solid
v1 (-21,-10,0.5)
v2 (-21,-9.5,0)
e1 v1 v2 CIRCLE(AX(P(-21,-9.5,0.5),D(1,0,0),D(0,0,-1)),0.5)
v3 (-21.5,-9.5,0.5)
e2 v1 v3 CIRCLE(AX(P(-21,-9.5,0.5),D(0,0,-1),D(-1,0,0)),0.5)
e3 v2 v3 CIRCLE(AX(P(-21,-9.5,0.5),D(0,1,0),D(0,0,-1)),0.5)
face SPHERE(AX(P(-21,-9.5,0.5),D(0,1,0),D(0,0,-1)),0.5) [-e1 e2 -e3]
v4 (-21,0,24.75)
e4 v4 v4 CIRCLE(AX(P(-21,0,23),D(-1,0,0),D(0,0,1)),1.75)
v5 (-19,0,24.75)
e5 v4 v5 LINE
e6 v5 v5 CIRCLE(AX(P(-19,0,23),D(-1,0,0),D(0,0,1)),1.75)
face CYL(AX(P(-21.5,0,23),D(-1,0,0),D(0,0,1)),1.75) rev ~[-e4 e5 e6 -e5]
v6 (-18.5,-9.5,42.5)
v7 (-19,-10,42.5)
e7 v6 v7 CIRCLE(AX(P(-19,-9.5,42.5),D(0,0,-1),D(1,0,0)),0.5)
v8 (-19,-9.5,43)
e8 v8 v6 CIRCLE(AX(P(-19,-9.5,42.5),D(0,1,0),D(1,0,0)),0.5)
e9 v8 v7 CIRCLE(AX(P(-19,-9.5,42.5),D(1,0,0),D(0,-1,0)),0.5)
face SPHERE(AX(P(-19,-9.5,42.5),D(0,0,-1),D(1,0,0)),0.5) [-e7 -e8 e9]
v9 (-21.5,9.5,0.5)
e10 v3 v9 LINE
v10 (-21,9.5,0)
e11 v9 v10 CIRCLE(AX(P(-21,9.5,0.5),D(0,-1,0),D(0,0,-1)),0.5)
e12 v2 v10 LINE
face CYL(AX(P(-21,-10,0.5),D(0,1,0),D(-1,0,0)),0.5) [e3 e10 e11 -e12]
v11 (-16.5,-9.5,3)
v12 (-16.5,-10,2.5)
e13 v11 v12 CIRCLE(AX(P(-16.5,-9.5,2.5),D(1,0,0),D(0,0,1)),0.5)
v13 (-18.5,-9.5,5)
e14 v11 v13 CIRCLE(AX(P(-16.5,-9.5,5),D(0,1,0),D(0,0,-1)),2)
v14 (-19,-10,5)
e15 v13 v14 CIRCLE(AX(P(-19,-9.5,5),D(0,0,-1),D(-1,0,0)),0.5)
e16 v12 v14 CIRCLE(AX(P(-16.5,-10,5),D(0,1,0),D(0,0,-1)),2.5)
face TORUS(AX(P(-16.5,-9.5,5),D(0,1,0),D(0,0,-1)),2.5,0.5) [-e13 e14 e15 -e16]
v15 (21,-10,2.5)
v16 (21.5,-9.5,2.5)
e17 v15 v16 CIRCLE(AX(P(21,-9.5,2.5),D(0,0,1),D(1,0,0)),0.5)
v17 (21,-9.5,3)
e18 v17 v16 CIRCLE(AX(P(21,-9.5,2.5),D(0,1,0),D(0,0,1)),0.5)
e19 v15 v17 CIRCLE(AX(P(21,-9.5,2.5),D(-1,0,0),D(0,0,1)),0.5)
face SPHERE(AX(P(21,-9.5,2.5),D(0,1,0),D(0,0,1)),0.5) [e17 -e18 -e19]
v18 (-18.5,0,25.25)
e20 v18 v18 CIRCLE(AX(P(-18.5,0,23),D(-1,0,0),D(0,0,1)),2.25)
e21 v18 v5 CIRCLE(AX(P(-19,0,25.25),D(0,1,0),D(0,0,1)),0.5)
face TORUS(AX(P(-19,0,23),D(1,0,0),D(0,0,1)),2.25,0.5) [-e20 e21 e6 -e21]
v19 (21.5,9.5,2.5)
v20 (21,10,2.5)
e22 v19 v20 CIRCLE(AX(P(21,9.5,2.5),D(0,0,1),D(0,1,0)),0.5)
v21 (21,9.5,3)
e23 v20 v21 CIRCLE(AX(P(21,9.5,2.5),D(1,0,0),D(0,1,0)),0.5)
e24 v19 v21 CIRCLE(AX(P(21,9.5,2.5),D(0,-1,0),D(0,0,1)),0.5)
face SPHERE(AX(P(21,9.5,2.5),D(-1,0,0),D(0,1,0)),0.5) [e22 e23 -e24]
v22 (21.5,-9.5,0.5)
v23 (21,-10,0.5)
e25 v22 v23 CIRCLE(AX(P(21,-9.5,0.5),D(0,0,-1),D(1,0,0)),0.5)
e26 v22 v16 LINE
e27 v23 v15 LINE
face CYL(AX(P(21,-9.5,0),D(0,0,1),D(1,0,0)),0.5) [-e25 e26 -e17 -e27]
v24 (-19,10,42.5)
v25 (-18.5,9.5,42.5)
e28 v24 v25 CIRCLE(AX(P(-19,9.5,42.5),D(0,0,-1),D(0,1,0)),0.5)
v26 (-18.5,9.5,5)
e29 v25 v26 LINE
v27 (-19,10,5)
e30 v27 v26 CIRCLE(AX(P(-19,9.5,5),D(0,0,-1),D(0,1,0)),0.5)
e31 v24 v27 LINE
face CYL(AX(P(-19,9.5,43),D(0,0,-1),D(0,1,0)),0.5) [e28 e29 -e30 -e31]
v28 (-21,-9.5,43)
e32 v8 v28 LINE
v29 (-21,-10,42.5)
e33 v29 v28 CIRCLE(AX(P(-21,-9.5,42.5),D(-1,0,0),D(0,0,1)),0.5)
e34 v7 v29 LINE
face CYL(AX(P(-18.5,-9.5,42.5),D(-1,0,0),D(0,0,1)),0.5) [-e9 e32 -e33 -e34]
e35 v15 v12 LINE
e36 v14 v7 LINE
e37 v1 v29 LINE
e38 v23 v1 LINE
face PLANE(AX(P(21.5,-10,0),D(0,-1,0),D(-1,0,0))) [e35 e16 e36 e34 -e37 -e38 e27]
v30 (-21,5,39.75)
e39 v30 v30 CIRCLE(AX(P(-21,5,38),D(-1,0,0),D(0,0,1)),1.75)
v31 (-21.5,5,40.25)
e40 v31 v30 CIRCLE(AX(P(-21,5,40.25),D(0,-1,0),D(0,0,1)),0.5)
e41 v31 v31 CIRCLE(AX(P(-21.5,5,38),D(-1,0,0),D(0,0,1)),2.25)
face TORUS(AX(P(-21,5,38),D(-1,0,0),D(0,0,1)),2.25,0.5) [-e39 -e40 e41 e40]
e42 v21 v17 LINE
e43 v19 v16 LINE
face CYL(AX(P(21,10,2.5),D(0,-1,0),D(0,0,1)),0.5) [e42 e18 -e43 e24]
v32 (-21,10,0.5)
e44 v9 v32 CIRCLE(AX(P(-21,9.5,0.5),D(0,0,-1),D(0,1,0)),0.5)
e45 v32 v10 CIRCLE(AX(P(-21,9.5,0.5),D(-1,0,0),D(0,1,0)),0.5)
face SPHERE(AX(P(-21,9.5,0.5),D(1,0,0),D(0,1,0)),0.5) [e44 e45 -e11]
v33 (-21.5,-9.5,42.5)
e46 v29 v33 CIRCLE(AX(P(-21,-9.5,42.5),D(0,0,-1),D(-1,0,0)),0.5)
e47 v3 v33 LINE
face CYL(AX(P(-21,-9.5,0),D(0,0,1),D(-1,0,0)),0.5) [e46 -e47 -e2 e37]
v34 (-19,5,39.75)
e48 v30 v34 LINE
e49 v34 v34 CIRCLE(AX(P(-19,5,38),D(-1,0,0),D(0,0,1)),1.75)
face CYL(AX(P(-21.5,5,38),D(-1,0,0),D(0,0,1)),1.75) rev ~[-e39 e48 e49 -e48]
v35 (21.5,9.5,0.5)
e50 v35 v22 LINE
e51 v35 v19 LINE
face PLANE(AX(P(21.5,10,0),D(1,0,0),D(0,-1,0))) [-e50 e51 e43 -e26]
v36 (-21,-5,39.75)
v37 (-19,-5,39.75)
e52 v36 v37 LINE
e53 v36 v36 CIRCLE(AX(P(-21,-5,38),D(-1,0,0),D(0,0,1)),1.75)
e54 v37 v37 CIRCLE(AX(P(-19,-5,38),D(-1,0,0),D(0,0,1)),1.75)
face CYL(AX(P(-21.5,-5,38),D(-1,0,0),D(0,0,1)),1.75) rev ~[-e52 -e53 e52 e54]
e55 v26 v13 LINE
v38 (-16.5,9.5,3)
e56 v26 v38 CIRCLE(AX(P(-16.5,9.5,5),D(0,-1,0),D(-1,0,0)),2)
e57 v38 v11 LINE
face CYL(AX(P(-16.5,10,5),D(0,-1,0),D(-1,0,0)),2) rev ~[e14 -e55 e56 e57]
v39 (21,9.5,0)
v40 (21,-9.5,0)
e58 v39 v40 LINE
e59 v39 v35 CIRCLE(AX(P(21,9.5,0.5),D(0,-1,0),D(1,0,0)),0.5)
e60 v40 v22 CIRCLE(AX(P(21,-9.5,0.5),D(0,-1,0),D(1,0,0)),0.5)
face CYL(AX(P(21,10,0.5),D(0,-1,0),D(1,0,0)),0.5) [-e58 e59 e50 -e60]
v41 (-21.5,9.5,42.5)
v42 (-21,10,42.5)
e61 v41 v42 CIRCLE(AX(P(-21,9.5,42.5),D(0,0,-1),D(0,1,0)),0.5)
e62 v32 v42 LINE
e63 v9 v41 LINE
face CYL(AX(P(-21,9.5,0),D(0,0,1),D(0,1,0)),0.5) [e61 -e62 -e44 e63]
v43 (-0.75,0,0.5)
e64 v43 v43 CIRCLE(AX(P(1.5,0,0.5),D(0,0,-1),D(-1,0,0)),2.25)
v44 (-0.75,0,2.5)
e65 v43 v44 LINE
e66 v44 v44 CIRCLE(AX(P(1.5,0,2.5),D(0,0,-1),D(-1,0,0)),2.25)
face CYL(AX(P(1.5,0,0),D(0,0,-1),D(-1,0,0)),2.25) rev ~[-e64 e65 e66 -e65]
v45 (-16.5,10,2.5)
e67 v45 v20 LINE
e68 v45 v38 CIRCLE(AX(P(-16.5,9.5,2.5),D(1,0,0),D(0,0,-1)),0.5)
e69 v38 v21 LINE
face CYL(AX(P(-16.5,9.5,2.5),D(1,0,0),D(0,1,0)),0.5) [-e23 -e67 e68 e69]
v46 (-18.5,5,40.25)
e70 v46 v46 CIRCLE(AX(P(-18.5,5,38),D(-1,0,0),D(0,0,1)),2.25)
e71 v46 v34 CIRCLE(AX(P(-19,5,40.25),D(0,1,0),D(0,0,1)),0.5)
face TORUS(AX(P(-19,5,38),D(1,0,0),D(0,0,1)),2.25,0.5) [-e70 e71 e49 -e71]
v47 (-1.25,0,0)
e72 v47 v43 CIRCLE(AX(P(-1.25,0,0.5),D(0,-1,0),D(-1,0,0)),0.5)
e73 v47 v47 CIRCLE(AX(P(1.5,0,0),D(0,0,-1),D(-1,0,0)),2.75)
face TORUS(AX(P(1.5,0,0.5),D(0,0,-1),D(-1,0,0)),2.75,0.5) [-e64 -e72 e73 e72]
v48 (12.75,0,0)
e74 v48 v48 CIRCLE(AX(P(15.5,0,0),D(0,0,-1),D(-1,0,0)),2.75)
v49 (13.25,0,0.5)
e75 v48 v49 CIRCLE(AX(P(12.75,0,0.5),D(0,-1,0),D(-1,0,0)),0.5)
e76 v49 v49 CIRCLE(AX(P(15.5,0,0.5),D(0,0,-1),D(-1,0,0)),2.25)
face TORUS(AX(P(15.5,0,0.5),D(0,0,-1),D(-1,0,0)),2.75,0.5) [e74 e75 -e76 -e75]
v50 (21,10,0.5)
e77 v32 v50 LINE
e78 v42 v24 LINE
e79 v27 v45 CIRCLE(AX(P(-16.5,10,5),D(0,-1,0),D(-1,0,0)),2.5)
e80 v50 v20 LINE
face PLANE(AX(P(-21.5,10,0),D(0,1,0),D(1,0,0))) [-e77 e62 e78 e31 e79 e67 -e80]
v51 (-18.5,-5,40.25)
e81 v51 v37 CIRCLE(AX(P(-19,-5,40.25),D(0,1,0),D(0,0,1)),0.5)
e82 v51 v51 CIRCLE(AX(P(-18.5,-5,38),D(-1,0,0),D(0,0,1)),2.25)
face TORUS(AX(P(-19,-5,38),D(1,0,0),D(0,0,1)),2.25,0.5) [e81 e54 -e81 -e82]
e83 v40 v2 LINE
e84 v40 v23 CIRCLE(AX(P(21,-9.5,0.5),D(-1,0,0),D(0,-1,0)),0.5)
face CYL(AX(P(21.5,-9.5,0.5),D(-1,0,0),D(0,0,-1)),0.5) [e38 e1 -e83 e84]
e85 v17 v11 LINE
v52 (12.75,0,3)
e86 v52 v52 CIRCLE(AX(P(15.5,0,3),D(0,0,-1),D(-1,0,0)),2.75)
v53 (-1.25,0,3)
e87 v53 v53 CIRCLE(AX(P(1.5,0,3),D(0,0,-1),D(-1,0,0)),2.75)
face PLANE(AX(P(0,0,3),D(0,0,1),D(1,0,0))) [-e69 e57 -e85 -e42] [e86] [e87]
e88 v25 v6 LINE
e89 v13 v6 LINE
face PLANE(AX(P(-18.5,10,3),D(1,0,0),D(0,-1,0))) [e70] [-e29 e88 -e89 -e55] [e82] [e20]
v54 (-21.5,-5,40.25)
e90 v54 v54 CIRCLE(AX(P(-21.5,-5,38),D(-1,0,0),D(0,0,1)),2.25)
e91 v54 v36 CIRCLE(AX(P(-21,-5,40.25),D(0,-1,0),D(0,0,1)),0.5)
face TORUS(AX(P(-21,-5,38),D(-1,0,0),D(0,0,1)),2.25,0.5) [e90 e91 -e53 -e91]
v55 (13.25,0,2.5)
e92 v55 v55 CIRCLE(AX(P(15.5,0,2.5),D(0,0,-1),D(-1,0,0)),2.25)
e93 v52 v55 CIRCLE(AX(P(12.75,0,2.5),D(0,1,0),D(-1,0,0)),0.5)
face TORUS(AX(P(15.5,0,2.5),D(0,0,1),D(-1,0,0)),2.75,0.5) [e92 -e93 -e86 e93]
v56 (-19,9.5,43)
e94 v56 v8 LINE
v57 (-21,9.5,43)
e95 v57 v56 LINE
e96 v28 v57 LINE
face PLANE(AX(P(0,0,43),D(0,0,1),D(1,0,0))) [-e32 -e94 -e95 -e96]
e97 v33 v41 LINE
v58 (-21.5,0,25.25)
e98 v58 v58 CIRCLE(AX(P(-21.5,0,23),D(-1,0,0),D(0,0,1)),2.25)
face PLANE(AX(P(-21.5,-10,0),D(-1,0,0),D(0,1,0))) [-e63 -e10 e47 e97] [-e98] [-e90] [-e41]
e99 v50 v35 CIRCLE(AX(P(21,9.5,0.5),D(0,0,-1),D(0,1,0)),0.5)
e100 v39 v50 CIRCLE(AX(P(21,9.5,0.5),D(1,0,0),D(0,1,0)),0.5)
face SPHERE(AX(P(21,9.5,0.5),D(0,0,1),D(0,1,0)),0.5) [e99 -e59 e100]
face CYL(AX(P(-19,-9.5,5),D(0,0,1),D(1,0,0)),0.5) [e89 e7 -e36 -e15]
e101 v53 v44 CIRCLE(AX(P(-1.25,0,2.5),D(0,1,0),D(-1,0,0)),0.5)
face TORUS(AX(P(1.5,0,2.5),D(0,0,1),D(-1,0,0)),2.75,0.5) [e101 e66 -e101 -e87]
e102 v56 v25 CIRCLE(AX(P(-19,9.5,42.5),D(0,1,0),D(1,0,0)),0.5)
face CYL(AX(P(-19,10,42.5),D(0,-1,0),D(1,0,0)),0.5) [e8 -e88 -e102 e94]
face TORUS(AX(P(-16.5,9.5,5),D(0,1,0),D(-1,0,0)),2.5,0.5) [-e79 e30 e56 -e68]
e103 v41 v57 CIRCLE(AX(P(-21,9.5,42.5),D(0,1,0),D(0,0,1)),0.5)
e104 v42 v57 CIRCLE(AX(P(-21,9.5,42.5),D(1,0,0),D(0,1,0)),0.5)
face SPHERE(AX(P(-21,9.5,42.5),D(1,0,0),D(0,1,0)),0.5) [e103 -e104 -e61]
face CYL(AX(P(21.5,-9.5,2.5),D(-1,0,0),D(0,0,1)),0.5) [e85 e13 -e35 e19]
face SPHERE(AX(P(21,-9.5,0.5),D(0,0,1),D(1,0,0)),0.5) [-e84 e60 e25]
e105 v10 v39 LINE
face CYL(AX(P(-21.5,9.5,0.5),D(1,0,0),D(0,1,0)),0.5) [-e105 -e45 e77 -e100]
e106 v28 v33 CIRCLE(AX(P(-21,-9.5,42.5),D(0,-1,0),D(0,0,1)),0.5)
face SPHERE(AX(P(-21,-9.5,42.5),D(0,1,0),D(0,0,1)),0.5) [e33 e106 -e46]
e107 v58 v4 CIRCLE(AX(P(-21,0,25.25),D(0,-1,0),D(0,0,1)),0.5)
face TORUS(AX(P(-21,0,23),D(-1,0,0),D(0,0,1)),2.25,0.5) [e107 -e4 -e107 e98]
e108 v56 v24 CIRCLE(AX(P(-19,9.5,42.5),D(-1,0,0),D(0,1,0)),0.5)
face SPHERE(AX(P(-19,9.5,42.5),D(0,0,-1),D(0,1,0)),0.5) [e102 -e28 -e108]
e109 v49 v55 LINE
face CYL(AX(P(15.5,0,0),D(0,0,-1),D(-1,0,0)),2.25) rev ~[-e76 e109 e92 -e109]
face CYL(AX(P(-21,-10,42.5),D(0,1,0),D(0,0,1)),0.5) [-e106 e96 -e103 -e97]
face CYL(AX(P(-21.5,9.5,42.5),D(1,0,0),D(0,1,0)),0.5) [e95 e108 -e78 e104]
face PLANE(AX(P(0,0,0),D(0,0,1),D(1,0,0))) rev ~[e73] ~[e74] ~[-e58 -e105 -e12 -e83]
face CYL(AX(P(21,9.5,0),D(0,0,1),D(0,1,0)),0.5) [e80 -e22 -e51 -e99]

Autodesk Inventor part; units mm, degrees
ref_plane "YZ Plane" through (0, 0, 0) normal (1, 0, 0) x (0, 1, 0)
ref_plane "XZ Plane" through (0, 0, 0) normal (0, 1, 0) x (-1, 0, 0)
ref_plane "XY Plane" through (0, 0, 0) normal (0, 0, 1) x (1, 0, 0)
sketch "Sketch1" plane through (0, 0, 0) normal (0, 0, 1) x (1, 0, 0)
  line L0 (-21.5, 10) -> (21.5, 10)
  line L1 (21.5, 10) -> (21.5, -10)
  line L2 (21.5, -10) -> (-21.5, -10)
  line L3 (-21.5, -10) -> (-21.5, 10)
  line L4 (-21.5, 10) -> (21.5, -10) construction
  line L5 (-21.5, -10) -> (21.5, 10) construction
  point P0 (0, 0)
  point P1 (0, 0)
  point P2 (0, 0)
  dimension "d0" = 20
  dimension "d1" = 43
extrude "Extrusion1" add sketch "Sketch1" along normal blind 3
sketch "Sketch2" plane through (0, 0, 3) normal (0, 0, 1) x (1, 0, 0)
  line L0 (-21.5, 10) -> (-18.5, 10)
  line L1 (-18.5, 10) -> (-18.5, -10)
  line L2 (-18.5, -10) -> (-21.5, -10)
  line L3 (-21.5, -10) -> (-21.5, 10)
  point P0 (0, 0)
  dimension "d4" = 3
extrude "Extrusion2" add sketch "Sketch2" along normal blind 40
sketch "Sketch3" plane through (0, 0, 0) normal (0, 0, -1) x (-1, 0, 0)
  circle A0 centre (-15.5, 0) radius 2.25
  circle A1 centre (-1.5, 0) radius 2.25
  line L0 (18.5, 10) -> (18.5, -10) projected
  point P0 (0, 0)
  dimension "d7" = 4.5
  dimension "d8" = 4.5
  dimension "d9" = 14
  dimension "d10" = 20
extrude "Extrusion3" cut sketch "Sketch3" against normal up to surface (3 mm away)
sketch "Sketch4" plane through (-21.5, -10, 0) normal (-1, 0, 0) x (0, 0, 1)
  circle A0 centre (23, 10) radius 1.75
  circle A1 centre (38, 15) radius 1.75
  circle A2 centre (38, 5) radius 1.75
  line L0 (43, 20) -> (43, 0) projected
  line L1 (0, 0) -> (43, 0) projected
  line L2 (0, 20) -> (43, 20) projected
  line L3 (0, 20) -> (0, 0) projected
  point P0 (0, 10)
  point P1 (0, 10)
  dimension "d13" = 3.5
  dimension "d14" = 3.5
  dimension "d15" = 3.5
  dimension "d16" = 15
  dimension "d17" = 5
  dimension "d18" = 10
  dimension "d19" = 20
  dimension "d20" = 5
extrude "Extrusion4" cut sketch "Sketch4" against normal blind 10 contours A0 | A1 | A2
fillet "Fillet1" radius 2 1 edges at (-18.5, 0, 3)
fillet "Fillet2" radius 0.5 29 edges at (2.5, 10, 3) (-17.9142, 10, 3.5858) (21.5, 10, 1.5) (-18.5, 10, 24) (0, 10, 0) (-20, 10, 43) (-21.5, 10, 21.5) (21.5, 0, 3) (2.5, -10, 3) (3.75, 0, 3) (17.75, 0, 3) (-17.9142, -10, 3.5858) (21.5, -10, 1.5) (21.5, 0, 0) (-18.5, -10, 24) (-18.5, 0, 43) (-18.5, -5, 36.25) (-18.5, 5, 36.25) (-18.5, 0, 21.25) (-21.5, 0, 0) (0, -10, 0) (3.75, 0, 0) (17.75, 0, 0) (-21.5, 0, 43) (-20, -10, 43) (-21.5, -10, 21.5) (-21.5, 5, 36.25) (-21.5, -5, 36.25) (-21.5, 0, 21.25)
properties part number "angle_back"
